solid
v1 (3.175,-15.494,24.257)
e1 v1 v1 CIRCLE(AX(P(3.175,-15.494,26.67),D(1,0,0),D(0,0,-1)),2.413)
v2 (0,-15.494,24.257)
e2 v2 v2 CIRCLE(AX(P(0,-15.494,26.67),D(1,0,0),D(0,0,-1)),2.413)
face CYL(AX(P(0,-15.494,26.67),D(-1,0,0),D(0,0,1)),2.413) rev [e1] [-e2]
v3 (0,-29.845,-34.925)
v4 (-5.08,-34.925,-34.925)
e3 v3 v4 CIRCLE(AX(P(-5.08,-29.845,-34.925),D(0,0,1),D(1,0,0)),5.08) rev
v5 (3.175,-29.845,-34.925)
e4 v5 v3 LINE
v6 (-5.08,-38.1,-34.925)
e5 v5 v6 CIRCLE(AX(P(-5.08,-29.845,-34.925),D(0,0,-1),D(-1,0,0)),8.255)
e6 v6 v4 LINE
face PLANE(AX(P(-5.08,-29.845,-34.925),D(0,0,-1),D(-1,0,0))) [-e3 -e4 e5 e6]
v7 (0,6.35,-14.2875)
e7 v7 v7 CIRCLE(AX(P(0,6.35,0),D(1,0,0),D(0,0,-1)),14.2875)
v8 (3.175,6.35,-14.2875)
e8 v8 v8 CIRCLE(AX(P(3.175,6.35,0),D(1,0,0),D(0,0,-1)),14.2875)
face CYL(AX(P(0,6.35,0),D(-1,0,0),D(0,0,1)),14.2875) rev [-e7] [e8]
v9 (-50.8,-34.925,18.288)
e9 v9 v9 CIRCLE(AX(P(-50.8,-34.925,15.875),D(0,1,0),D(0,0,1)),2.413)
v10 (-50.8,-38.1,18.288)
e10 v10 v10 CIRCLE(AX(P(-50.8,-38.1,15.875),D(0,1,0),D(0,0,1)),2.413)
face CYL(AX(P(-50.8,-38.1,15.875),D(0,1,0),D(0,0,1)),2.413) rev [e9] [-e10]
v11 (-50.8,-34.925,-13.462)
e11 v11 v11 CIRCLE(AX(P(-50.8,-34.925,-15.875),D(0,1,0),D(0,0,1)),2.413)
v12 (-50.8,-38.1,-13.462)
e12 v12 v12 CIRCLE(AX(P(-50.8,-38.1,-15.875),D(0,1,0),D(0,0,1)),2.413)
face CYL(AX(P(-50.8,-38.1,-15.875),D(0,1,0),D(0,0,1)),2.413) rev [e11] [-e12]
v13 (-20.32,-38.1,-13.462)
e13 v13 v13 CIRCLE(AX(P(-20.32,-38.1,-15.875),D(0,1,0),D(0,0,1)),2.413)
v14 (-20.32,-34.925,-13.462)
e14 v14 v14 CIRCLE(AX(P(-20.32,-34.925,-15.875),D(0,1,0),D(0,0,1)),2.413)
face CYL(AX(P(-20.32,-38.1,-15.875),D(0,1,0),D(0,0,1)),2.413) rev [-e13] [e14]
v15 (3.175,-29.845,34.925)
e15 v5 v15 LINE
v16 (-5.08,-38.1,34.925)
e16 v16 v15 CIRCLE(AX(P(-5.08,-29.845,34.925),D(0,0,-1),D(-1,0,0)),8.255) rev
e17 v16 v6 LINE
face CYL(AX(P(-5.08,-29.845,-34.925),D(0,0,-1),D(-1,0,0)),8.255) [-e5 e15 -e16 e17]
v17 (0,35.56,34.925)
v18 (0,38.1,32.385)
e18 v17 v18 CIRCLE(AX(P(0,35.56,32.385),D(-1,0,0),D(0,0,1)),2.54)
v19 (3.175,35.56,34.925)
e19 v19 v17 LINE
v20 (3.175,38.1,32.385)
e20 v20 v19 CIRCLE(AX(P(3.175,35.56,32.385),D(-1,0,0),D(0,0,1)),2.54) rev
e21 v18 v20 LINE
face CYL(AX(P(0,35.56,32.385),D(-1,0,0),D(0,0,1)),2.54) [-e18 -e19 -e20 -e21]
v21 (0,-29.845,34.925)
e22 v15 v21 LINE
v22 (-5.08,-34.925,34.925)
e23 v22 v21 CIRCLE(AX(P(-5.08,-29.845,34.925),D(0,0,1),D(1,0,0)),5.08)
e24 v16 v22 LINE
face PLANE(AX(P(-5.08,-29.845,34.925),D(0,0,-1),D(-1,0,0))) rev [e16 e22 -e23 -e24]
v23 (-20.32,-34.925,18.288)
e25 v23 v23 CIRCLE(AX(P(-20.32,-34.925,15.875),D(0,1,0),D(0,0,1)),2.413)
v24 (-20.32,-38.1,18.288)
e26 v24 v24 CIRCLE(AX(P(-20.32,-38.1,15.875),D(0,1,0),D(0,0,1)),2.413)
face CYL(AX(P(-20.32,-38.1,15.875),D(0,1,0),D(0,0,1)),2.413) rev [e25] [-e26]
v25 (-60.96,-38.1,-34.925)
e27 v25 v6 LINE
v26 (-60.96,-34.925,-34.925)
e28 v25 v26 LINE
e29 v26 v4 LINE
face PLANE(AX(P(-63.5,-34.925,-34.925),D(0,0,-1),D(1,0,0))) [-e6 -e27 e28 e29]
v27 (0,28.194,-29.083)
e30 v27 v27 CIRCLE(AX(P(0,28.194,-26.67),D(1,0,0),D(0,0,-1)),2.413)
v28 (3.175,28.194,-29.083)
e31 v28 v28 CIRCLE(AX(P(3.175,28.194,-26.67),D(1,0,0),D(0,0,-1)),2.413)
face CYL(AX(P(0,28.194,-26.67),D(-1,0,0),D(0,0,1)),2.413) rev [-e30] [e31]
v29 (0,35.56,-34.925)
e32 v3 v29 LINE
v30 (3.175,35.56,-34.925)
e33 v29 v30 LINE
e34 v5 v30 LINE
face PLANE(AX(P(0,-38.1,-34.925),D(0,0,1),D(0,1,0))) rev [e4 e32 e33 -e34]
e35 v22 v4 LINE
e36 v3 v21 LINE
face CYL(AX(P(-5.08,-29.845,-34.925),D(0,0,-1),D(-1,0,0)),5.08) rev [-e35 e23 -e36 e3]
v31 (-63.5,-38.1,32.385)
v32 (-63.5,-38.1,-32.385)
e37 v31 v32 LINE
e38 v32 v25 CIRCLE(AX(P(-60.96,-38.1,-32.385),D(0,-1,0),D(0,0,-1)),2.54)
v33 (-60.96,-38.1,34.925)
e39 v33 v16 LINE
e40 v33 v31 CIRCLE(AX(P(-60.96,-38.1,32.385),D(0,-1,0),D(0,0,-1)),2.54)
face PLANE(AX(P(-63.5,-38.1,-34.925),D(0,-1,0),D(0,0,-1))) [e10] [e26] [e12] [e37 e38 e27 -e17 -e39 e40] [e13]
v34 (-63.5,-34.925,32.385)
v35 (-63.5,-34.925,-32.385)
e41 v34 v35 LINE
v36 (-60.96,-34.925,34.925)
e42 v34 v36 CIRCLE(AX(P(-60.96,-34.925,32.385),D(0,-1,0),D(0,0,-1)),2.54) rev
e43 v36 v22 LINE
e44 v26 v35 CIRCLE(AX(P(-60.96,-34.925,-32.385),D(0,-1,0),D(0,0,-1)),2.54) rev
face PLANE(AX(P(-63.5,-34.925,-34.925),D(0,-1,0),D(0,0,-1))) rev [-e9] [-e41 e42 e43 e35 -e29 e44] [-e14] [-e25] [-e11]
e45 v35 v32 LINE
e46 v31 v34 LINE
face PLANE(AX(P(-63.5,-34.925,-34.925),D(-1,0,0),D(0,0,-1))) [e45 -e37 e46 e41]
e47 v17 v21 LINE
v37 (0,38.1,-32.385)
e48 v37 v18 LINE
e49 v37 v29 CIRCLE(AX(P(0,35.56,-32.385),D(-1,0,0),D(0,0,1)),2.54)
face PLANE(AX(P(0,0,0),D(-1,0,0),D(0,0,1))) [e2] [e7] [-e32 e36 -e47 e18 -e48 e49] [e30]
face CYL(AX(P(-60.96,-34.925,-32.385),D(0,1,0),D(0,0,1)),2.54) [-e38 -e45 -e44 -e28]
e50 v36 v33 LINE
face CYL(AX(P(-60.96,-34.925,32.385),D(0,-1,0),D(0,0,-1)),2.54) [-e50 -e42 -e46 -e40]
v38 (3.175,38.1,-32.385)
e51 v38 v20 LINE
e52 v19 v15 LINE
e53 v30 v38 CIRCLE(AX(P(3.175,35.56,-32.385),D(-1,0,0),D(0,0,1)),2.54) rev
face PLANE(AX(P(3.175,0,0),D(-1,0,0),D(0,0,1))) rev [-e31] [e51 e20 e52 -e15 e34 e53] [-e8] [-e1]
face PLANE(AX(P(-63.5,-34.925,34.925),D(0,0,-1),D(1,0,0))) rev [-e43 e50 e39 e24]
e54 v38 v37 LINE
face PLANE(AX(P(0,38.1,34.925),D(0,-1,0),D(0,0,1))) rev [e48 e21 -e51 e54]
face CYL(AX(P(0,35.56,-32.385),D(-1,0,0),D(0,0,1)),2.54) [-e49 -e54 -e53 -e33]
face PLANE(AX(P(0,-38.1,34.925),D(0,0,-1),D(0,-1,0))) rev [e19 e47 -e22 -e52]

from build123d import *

# Parameters (mm, degrees)
SKETCH1_W              = 69.85
SKETCH1_H              = 76.2
SKETCH1_R              = 14.2875
SKETCH1_R_2            = 2.413
BOSS_EXTRUDE1_DEPTH    = 3.175
SKETCH2_W              = 69.85
SKETCH2_H              = 3.175
BOSS_EXTRUDE2_DEPTH    = 63.5
CONVERT_SOLID1_START   = -34.925
CONVERT_SOLID1_DEPTH   = 69.85
CONVERT_SOLID1_2_DEPTH = 69.85
FILLET1_R              = 2.54
SKETCH7_R              = 2.413
CUT_EXTRUDE1_DEPTH     = 103.881758587


# Read off the part's stored shape, not the designer's step: Convert-Solid1
with BuildPart() as part:
    # Sketch1 → Boss-Extrude1 (new body)
    with BuildSketch(Plane(origin=(0, 0, 0), x_dir=(0, 0, -1), z_dir=(1, 0, 0))):
        Rectangle(SKETCH1_W, SKETCH1_H)
        with Locations((0, 6.35)):
            Circle(SKETCH1_R, mode=Mode.SUBTRACT)
        with Locations((26.67, 28.194)):
            Circle(SKETCH1_R_2, mode=Mode.SUBTRACT)
        with Locations((-26.67, -15.494)):
            Circle(SKETCH1_R_2, mode=Mode.SUBTRACT)
    extrude(amount=BOSS_EXTRUDE1_DEPTH)

    # Sketch2 → Boss-Extrude2 (add)
    with BuildSketch(Plane.ZY):
        with Locations((0, -36.5125)):
            Rectangle(SKETCH2_W, SKETCH2_H)
    extrude(amount=BOSS_EXTRUDE2_DEPTH)

    # Convert-Solid1 outline → Convert-Solid1 (cut)
    with BuildSketch(Plane.XY.offset(CONVERT_SOLID1_START)):
        with BuildLine():
            Line((3.175, -38.1), (3.175, -29.845))
            ThreePointArc((3.175, -29.845), (0.757166479, -35.682166479), (-5.08, -38.1))
            Line((-5.08, -38.1), (3.175, -38.1))
        make_face()
    extrude(amount=CONVERT_SOLID1_DEPTH, mode=Mode.SUBTRACT)

    # Convert-Solid1 2 outline → Convert-Solid1 2 (add)
    with BuildSketch(Plane.XY.offset(CONVERT_SOLID1_START)):
        with BuildLine():
            Line((0, -34.925), (0, -29.845))
            ThreePointArc((0, -29.845), (-1.487897552, -33.437102448), (-5.08, -34.925))
            Line((-5.08, -34.925), (0, -34.925))
        make_face()
    extrude(amount=CONVERT_SOLID1_2_DEPTH)

    # Fillet1
    fillet1_edges = [part.edges().sort_by_distance(p)[0] for p in [
        (1.5875, 38.1, -34.925),
        (1.5875, 38.1, 34.925),
        (-63.5, -36.5125, 34.925),
        (-63.5, -36.5125, -34.925),
    ]]
    fillet(fillet1_edges, radius=FILLET1_R)

    # Sketch7 → Cut-Extrude1 (cut, through all)
    with BuildSketch(Plane(origin=(0, -34.925, 0), x_dir=(1, 0, 0), z_dir=(0, 1, 0))):
        with Locations(Location((-50.8, 15.875, 0), (0, 0, 270))):
            Circle(SKETCH7_R)
        with Locations(Location((-20.32, 15.875, 0), (0, 0, 270))):
            Circle(SKETCH7_R)
        with Locations(Location((-50.8, -15.875, 0), (0, 0, 270))):
            Circle(SKETCH7_R)
        with Locations(Location((-20.32, -15.875, 0), (0, 0, 270))):
            Circle(SKETCH7_R)
    extrude(amount=-CUT_EXTRUDE1_DEPTH, mode=Mode.SUBTRACT)


solid = part.part
